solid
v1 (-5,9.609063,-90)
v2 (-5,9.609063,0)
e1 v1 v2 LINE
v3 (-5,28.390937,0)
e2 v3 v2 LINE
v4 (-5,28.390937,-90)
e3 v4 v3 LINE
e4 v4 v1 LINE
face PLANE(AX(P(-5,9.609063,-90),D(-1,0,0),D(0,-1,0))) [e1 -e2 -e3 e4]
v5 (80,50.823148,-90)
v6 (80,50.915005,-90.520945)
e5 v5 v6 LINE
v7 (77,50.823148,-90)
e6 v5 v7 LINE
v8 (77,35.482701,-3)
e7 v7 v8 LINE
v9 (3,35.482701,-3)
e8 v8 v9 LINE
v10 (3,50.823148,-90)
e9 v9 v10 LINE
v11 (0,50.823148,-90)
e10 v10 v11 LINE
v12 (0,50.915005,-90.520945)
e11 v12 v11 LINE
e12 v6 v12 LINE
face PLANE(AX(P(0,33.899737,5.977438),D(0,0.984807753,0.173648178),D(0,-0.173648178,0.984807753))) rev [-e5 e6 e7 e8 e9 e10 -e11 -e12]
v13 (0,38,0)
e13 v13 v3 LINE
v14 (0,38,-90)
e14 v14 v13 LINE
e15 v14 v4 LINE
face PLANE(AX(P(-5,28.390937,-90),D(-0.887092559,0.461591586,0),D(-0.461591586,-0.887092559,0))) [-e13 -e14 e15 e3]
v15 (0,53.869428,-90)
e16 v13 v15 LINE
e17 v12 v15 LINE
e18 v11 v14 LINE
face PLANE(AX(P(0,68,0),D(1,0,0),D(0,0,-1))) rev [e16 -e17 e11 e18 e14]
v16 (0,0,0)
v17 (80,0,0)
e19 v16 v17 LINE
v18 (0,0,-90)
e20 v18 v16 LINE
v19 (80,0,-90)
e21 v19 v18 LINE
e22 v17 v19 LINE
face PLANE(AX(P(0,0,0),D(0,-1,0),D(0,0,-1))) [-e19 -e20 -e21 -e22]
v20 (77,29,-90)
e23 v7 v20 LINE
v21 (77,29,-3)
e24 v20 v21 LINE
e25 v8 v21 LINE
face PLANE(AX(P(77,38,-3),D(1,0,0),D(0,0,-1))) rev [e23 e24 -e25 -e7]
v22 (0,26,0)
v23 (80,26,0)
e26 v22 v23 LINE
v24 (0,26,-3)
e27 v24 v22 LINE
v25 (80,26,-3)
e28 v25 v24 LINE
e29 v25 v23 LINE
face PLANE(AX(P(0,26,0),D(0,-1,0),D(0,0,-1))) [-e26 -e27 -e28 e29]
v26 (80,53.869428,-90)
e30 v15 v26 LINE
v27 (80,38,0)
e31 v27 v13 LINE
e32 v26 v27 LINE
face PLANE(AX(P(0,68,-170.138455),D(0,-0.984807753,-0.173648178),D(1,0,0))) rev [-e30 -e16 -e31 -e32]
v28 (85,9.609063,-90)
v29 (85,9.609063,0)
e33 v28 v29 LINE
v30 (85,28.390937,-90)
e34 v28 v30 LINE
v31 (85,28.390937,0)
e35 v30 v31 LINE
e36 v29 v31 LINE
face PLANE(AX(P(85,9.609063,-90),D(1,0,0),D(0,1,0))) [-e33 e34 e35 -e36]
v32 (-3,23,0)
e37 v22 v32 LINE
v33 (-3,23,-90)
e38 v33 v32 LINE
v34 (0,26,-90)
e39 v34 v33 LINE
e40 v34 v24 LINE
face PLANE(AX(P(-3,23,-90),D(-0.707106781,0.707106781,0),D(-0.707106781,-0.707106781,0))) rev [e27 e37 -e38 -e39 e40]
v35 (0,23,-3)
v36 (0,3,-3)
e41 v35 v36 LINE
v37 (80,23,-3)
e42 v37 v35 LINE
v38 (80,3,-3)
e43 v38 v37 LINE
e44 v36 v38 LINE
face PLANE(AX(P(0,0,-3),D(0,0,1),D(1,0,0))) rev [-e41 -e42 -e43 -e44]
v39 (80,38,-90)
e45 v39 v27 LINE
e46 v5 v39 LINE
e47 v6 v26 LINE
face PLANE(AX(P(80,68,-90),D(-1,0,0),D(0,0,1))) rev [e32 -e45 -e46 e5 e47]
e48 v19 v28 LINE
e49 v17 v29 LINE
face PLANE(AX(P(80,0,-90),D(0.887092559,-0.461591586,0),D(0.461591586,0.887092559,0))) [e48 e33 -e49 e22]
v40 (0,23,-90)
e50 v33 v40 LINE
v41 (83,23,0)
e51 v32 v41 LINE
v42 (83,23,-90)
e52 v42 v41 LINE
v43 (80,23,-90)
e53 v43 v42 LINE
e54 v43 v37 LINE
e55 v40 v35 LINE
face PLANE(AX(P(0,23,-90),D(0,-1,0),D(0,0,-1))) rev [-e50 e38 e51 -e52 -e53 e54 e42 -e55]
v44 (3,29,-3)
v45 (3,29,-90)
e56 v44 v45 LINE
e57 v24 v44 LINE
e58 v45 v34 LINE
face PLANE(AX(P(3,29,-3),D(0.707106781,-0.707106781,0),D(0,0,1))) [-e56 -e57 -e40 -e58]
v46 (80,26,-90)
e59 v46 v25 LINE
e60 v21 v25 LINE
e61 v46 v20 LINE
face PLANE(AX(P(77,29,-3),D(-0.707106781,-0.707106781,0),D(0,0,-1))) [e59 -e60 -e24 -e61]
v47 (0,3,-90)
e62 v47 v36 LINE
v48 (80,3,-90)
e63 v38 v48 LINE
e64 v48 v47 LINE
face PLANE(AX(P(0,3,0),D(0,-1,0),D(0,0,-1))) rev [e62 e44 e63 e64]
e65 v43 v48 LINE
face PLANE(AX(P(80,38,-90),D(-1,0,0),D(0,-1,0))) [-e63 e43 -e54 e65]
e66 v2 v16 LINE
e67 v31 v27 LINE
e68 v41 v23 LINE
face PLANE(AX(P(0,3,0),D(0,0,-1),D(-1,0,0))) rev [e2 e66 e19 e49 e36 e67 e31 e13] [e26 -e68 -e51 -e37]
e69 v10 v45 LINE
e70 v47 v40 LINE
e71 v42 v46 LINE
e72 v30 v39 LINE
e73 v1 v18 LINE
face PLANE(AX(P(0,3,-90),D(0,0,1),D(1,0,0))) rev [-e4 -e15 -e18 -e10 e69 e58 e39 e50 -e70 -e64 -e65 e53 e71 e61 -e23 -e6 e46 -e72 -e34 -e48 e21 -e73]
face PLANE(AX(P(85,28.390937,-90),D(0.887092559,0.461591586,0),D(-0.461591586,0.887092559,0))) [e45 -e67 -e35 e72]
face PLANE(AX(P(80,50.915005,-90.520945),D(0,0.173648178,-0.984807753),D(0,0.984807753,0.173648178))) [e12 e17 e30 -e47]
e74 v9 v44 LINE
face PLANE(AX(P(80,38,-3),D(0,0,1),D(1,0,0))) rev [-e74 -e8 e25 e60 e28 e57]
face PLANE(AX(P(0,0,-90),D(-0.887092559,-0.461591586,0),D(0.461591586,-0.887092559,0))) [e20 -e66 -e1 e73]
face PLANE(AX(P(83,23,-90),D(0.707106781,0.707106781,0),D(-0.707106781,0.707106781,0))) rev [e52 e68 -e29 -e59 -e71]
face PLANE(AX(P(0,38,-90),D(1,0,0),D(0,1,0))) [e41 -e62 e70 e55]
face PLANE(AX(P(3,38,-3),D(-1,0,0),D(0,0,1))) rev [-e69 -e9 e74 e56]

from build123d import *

# Parameters (mm, degrees)
SKETCH1_W                      = 80
SKETCH1_H                      = 90
BOSS_EXTRUDE1_BASE_DEPTH       = 3
BOSS_EXTRUDE4_SIDE_WALLS_DEPTH = 90
CUT_EXTRUDE2_GUIDE_HOLES_DEPTH = 130.495173655
SKETCH15_W                     = 80
SKETCH15_H                     = 20
BOSS_EXTRUDE9_REAR_WALL_DEPTH  = 3
BOSS_EXTRUDE1_START            = 3
SKETCH17_W                     = 80
SKETCH17_H                     = 3
BOSS_EXTRUDE1_DEPTH            = 12
BOSS_EXTRUDE2_START            = 23
SKETCH20_W                     = 3
SKETCH20_H                     = 87
BOSS_EXTRUDE2_DEPTH            = 12
CHAMFER1_SIZE                  = 3
BOSS_EXTRUDE5_DEPTH            = 30
CHAMFER2_SIZE                  = 170.138454589
CHAMFER2_SIZE_2                = 30
SKETCH27_W                     = 80
SKETCH27_H                     = 91.38839507
BOSS_EXTRUDE6_DEPTH            = 3


# Some blends are built 0.0001 mm under size
with BuildPart() as part:
    # Sketch1 → Boss-Extrude1 _Base (new body)
    with BuildSketch(Plane(origin=(0, 0, 0), x_dir=(1, 0, 0), z_dir=(0, 1, 0))):
        with Locations((40, 45)):
            Rectangle(SKETCH1_W, SKETCH1_H)
    extrude(amount=BOSS_EXTRUDE1_BASE_DEPTH)

    # Sketch5 → Boss-Extrude4 _Side Walls (add, through all)
    with BuildSketch(Plane.XY):
        Polygon((-5, 28.390936655), (0, 38), (0, 0), (-5, 9.609063345), align=None)
        Polygon((85, 9.609063345), (85, 28.390936655), (80, 38), (80, 0), align=None)
    extrude(amount=-BOSS_EXTRUDE4_SIDE_WALLS_DEPTH)

    # Sketch4 → Cut-Extrude2 _Guide Holes (cut, through all)
    with BuildSketch(Plane.XY):
        Polygon((-3, 23), (0, 26), (0, 23), align=None)
        Polygon((80, 23), (83, 23), (80, 26), align=None)
    extrude(amount=-CUT_EXTRUDE2_GUIDE_HOLES_DEPTH, mode=Mode.SUBTRACT)

    # Sketch15 → Boss-Extrude9 _Rear Wall (add)
    with BuildSketch(Plane.XY):
        with Locations((40, 13)):
            Rectangle(SKETCH15_W, SKETCH15_H)
    extrude(amount=-BOSS_EXTRUDE9_REAR_WALL_DEPTH)

    # Sketch17 → Boss-Extrude1 (add)
    with BuildSketch(Plane(origin=(0, 23, 0), x_dir=(1, 0, 0), z_dir=(0, 1, 0)).offset(BOSS_EXTRUDE1_START)):
        with Locations((40, 1.5)):
            Rectangle(SKETCH17_W, SKETCH17_H)
    extrude(amount=BOSS_EXTRUDE1_DEPTH)

    # Sketch20 → Boss-Extrude2 (add)
    with BuildSketch(Plane(origin=(0, 3, 0), x_dir=(1, 0, 0), z_dir=(0, 1, 0)).offset(BOSS_EXTRUDE2_START)):
        with Locations((1.5, 46.5)):
            Rectangle(SKETCH20_W, SKETCH20_H)
        with Locations((78.5, 46.5)):
            Rectangle(SKETCH20_W, SKETCH20_H)
    extrude(amount=BOSS_EXTRUDE2_DEPTH)

    # Chamfer1
    chamfer1_edges = [part.edges().sort_by_distance(p)[0] for p in [
        (77, 26, -46.5),
        (3, 26, -46.5),
    ]]
    chamfer(chamfer1_edges, length=CHAMFER1_SIZE - 0.0001)  # a hair under: the kernel refuses the full size

    # Sketch26 → Boss-Extrude5 (add)
    with BuildSketch(Plane(origin=(0, 38, 0), x_dir=(1, 0, 0), z_dir=(0, 1, 0))):
        Polygon((77, 90), (80, 90), (80, 0), (0, 0), (0, 90), (3, 90), (3, 3), (77, 3), align=None)
    extrude(amount=BOSS_EXTRUDE5_DEPTH)

    # Chamfer2
    # the kernel refuses this chamfer: 170.138454589, 30 mm, written as the material it takes off along each edge
    with BuildSketch(Plane(origin=(522.111375011, 68, 0), x_dir=(0, 0.0066825316561015475, -0.9999776716360548), z_dir=(-1, 0, 0))) as chamfer2_piece_1:
        Polygon((CHAMFER2_SIZE * 0.999977671633, CHAMFER2_SIZE * 0.00668253165608), (-CHAMFER2_SIZE_2 * 0.0066825316561, CHAMFER2_SIZE_2 * 0.999977671636), (0, 0), align=None)
    extrude(amount=964.222750023, mode=Mode.SUBTRACT)

    # Sketch27 → Boss-Extrude6 (add)
    with BuildSketch(Plane(origin=(0, 36.854159795, 6.498382723), x_dir=(1, 0, 0), z_dir=(0, 0.9848077530122086, 0.17364817766692742))):
        with Locations((40, 52.292828286)):
            Rectangle(SKETCH27_W, SKETCH27_H)
    extrude(amount=-BOSS_EXTRUDE6_DEPTH)


solid = part.part
